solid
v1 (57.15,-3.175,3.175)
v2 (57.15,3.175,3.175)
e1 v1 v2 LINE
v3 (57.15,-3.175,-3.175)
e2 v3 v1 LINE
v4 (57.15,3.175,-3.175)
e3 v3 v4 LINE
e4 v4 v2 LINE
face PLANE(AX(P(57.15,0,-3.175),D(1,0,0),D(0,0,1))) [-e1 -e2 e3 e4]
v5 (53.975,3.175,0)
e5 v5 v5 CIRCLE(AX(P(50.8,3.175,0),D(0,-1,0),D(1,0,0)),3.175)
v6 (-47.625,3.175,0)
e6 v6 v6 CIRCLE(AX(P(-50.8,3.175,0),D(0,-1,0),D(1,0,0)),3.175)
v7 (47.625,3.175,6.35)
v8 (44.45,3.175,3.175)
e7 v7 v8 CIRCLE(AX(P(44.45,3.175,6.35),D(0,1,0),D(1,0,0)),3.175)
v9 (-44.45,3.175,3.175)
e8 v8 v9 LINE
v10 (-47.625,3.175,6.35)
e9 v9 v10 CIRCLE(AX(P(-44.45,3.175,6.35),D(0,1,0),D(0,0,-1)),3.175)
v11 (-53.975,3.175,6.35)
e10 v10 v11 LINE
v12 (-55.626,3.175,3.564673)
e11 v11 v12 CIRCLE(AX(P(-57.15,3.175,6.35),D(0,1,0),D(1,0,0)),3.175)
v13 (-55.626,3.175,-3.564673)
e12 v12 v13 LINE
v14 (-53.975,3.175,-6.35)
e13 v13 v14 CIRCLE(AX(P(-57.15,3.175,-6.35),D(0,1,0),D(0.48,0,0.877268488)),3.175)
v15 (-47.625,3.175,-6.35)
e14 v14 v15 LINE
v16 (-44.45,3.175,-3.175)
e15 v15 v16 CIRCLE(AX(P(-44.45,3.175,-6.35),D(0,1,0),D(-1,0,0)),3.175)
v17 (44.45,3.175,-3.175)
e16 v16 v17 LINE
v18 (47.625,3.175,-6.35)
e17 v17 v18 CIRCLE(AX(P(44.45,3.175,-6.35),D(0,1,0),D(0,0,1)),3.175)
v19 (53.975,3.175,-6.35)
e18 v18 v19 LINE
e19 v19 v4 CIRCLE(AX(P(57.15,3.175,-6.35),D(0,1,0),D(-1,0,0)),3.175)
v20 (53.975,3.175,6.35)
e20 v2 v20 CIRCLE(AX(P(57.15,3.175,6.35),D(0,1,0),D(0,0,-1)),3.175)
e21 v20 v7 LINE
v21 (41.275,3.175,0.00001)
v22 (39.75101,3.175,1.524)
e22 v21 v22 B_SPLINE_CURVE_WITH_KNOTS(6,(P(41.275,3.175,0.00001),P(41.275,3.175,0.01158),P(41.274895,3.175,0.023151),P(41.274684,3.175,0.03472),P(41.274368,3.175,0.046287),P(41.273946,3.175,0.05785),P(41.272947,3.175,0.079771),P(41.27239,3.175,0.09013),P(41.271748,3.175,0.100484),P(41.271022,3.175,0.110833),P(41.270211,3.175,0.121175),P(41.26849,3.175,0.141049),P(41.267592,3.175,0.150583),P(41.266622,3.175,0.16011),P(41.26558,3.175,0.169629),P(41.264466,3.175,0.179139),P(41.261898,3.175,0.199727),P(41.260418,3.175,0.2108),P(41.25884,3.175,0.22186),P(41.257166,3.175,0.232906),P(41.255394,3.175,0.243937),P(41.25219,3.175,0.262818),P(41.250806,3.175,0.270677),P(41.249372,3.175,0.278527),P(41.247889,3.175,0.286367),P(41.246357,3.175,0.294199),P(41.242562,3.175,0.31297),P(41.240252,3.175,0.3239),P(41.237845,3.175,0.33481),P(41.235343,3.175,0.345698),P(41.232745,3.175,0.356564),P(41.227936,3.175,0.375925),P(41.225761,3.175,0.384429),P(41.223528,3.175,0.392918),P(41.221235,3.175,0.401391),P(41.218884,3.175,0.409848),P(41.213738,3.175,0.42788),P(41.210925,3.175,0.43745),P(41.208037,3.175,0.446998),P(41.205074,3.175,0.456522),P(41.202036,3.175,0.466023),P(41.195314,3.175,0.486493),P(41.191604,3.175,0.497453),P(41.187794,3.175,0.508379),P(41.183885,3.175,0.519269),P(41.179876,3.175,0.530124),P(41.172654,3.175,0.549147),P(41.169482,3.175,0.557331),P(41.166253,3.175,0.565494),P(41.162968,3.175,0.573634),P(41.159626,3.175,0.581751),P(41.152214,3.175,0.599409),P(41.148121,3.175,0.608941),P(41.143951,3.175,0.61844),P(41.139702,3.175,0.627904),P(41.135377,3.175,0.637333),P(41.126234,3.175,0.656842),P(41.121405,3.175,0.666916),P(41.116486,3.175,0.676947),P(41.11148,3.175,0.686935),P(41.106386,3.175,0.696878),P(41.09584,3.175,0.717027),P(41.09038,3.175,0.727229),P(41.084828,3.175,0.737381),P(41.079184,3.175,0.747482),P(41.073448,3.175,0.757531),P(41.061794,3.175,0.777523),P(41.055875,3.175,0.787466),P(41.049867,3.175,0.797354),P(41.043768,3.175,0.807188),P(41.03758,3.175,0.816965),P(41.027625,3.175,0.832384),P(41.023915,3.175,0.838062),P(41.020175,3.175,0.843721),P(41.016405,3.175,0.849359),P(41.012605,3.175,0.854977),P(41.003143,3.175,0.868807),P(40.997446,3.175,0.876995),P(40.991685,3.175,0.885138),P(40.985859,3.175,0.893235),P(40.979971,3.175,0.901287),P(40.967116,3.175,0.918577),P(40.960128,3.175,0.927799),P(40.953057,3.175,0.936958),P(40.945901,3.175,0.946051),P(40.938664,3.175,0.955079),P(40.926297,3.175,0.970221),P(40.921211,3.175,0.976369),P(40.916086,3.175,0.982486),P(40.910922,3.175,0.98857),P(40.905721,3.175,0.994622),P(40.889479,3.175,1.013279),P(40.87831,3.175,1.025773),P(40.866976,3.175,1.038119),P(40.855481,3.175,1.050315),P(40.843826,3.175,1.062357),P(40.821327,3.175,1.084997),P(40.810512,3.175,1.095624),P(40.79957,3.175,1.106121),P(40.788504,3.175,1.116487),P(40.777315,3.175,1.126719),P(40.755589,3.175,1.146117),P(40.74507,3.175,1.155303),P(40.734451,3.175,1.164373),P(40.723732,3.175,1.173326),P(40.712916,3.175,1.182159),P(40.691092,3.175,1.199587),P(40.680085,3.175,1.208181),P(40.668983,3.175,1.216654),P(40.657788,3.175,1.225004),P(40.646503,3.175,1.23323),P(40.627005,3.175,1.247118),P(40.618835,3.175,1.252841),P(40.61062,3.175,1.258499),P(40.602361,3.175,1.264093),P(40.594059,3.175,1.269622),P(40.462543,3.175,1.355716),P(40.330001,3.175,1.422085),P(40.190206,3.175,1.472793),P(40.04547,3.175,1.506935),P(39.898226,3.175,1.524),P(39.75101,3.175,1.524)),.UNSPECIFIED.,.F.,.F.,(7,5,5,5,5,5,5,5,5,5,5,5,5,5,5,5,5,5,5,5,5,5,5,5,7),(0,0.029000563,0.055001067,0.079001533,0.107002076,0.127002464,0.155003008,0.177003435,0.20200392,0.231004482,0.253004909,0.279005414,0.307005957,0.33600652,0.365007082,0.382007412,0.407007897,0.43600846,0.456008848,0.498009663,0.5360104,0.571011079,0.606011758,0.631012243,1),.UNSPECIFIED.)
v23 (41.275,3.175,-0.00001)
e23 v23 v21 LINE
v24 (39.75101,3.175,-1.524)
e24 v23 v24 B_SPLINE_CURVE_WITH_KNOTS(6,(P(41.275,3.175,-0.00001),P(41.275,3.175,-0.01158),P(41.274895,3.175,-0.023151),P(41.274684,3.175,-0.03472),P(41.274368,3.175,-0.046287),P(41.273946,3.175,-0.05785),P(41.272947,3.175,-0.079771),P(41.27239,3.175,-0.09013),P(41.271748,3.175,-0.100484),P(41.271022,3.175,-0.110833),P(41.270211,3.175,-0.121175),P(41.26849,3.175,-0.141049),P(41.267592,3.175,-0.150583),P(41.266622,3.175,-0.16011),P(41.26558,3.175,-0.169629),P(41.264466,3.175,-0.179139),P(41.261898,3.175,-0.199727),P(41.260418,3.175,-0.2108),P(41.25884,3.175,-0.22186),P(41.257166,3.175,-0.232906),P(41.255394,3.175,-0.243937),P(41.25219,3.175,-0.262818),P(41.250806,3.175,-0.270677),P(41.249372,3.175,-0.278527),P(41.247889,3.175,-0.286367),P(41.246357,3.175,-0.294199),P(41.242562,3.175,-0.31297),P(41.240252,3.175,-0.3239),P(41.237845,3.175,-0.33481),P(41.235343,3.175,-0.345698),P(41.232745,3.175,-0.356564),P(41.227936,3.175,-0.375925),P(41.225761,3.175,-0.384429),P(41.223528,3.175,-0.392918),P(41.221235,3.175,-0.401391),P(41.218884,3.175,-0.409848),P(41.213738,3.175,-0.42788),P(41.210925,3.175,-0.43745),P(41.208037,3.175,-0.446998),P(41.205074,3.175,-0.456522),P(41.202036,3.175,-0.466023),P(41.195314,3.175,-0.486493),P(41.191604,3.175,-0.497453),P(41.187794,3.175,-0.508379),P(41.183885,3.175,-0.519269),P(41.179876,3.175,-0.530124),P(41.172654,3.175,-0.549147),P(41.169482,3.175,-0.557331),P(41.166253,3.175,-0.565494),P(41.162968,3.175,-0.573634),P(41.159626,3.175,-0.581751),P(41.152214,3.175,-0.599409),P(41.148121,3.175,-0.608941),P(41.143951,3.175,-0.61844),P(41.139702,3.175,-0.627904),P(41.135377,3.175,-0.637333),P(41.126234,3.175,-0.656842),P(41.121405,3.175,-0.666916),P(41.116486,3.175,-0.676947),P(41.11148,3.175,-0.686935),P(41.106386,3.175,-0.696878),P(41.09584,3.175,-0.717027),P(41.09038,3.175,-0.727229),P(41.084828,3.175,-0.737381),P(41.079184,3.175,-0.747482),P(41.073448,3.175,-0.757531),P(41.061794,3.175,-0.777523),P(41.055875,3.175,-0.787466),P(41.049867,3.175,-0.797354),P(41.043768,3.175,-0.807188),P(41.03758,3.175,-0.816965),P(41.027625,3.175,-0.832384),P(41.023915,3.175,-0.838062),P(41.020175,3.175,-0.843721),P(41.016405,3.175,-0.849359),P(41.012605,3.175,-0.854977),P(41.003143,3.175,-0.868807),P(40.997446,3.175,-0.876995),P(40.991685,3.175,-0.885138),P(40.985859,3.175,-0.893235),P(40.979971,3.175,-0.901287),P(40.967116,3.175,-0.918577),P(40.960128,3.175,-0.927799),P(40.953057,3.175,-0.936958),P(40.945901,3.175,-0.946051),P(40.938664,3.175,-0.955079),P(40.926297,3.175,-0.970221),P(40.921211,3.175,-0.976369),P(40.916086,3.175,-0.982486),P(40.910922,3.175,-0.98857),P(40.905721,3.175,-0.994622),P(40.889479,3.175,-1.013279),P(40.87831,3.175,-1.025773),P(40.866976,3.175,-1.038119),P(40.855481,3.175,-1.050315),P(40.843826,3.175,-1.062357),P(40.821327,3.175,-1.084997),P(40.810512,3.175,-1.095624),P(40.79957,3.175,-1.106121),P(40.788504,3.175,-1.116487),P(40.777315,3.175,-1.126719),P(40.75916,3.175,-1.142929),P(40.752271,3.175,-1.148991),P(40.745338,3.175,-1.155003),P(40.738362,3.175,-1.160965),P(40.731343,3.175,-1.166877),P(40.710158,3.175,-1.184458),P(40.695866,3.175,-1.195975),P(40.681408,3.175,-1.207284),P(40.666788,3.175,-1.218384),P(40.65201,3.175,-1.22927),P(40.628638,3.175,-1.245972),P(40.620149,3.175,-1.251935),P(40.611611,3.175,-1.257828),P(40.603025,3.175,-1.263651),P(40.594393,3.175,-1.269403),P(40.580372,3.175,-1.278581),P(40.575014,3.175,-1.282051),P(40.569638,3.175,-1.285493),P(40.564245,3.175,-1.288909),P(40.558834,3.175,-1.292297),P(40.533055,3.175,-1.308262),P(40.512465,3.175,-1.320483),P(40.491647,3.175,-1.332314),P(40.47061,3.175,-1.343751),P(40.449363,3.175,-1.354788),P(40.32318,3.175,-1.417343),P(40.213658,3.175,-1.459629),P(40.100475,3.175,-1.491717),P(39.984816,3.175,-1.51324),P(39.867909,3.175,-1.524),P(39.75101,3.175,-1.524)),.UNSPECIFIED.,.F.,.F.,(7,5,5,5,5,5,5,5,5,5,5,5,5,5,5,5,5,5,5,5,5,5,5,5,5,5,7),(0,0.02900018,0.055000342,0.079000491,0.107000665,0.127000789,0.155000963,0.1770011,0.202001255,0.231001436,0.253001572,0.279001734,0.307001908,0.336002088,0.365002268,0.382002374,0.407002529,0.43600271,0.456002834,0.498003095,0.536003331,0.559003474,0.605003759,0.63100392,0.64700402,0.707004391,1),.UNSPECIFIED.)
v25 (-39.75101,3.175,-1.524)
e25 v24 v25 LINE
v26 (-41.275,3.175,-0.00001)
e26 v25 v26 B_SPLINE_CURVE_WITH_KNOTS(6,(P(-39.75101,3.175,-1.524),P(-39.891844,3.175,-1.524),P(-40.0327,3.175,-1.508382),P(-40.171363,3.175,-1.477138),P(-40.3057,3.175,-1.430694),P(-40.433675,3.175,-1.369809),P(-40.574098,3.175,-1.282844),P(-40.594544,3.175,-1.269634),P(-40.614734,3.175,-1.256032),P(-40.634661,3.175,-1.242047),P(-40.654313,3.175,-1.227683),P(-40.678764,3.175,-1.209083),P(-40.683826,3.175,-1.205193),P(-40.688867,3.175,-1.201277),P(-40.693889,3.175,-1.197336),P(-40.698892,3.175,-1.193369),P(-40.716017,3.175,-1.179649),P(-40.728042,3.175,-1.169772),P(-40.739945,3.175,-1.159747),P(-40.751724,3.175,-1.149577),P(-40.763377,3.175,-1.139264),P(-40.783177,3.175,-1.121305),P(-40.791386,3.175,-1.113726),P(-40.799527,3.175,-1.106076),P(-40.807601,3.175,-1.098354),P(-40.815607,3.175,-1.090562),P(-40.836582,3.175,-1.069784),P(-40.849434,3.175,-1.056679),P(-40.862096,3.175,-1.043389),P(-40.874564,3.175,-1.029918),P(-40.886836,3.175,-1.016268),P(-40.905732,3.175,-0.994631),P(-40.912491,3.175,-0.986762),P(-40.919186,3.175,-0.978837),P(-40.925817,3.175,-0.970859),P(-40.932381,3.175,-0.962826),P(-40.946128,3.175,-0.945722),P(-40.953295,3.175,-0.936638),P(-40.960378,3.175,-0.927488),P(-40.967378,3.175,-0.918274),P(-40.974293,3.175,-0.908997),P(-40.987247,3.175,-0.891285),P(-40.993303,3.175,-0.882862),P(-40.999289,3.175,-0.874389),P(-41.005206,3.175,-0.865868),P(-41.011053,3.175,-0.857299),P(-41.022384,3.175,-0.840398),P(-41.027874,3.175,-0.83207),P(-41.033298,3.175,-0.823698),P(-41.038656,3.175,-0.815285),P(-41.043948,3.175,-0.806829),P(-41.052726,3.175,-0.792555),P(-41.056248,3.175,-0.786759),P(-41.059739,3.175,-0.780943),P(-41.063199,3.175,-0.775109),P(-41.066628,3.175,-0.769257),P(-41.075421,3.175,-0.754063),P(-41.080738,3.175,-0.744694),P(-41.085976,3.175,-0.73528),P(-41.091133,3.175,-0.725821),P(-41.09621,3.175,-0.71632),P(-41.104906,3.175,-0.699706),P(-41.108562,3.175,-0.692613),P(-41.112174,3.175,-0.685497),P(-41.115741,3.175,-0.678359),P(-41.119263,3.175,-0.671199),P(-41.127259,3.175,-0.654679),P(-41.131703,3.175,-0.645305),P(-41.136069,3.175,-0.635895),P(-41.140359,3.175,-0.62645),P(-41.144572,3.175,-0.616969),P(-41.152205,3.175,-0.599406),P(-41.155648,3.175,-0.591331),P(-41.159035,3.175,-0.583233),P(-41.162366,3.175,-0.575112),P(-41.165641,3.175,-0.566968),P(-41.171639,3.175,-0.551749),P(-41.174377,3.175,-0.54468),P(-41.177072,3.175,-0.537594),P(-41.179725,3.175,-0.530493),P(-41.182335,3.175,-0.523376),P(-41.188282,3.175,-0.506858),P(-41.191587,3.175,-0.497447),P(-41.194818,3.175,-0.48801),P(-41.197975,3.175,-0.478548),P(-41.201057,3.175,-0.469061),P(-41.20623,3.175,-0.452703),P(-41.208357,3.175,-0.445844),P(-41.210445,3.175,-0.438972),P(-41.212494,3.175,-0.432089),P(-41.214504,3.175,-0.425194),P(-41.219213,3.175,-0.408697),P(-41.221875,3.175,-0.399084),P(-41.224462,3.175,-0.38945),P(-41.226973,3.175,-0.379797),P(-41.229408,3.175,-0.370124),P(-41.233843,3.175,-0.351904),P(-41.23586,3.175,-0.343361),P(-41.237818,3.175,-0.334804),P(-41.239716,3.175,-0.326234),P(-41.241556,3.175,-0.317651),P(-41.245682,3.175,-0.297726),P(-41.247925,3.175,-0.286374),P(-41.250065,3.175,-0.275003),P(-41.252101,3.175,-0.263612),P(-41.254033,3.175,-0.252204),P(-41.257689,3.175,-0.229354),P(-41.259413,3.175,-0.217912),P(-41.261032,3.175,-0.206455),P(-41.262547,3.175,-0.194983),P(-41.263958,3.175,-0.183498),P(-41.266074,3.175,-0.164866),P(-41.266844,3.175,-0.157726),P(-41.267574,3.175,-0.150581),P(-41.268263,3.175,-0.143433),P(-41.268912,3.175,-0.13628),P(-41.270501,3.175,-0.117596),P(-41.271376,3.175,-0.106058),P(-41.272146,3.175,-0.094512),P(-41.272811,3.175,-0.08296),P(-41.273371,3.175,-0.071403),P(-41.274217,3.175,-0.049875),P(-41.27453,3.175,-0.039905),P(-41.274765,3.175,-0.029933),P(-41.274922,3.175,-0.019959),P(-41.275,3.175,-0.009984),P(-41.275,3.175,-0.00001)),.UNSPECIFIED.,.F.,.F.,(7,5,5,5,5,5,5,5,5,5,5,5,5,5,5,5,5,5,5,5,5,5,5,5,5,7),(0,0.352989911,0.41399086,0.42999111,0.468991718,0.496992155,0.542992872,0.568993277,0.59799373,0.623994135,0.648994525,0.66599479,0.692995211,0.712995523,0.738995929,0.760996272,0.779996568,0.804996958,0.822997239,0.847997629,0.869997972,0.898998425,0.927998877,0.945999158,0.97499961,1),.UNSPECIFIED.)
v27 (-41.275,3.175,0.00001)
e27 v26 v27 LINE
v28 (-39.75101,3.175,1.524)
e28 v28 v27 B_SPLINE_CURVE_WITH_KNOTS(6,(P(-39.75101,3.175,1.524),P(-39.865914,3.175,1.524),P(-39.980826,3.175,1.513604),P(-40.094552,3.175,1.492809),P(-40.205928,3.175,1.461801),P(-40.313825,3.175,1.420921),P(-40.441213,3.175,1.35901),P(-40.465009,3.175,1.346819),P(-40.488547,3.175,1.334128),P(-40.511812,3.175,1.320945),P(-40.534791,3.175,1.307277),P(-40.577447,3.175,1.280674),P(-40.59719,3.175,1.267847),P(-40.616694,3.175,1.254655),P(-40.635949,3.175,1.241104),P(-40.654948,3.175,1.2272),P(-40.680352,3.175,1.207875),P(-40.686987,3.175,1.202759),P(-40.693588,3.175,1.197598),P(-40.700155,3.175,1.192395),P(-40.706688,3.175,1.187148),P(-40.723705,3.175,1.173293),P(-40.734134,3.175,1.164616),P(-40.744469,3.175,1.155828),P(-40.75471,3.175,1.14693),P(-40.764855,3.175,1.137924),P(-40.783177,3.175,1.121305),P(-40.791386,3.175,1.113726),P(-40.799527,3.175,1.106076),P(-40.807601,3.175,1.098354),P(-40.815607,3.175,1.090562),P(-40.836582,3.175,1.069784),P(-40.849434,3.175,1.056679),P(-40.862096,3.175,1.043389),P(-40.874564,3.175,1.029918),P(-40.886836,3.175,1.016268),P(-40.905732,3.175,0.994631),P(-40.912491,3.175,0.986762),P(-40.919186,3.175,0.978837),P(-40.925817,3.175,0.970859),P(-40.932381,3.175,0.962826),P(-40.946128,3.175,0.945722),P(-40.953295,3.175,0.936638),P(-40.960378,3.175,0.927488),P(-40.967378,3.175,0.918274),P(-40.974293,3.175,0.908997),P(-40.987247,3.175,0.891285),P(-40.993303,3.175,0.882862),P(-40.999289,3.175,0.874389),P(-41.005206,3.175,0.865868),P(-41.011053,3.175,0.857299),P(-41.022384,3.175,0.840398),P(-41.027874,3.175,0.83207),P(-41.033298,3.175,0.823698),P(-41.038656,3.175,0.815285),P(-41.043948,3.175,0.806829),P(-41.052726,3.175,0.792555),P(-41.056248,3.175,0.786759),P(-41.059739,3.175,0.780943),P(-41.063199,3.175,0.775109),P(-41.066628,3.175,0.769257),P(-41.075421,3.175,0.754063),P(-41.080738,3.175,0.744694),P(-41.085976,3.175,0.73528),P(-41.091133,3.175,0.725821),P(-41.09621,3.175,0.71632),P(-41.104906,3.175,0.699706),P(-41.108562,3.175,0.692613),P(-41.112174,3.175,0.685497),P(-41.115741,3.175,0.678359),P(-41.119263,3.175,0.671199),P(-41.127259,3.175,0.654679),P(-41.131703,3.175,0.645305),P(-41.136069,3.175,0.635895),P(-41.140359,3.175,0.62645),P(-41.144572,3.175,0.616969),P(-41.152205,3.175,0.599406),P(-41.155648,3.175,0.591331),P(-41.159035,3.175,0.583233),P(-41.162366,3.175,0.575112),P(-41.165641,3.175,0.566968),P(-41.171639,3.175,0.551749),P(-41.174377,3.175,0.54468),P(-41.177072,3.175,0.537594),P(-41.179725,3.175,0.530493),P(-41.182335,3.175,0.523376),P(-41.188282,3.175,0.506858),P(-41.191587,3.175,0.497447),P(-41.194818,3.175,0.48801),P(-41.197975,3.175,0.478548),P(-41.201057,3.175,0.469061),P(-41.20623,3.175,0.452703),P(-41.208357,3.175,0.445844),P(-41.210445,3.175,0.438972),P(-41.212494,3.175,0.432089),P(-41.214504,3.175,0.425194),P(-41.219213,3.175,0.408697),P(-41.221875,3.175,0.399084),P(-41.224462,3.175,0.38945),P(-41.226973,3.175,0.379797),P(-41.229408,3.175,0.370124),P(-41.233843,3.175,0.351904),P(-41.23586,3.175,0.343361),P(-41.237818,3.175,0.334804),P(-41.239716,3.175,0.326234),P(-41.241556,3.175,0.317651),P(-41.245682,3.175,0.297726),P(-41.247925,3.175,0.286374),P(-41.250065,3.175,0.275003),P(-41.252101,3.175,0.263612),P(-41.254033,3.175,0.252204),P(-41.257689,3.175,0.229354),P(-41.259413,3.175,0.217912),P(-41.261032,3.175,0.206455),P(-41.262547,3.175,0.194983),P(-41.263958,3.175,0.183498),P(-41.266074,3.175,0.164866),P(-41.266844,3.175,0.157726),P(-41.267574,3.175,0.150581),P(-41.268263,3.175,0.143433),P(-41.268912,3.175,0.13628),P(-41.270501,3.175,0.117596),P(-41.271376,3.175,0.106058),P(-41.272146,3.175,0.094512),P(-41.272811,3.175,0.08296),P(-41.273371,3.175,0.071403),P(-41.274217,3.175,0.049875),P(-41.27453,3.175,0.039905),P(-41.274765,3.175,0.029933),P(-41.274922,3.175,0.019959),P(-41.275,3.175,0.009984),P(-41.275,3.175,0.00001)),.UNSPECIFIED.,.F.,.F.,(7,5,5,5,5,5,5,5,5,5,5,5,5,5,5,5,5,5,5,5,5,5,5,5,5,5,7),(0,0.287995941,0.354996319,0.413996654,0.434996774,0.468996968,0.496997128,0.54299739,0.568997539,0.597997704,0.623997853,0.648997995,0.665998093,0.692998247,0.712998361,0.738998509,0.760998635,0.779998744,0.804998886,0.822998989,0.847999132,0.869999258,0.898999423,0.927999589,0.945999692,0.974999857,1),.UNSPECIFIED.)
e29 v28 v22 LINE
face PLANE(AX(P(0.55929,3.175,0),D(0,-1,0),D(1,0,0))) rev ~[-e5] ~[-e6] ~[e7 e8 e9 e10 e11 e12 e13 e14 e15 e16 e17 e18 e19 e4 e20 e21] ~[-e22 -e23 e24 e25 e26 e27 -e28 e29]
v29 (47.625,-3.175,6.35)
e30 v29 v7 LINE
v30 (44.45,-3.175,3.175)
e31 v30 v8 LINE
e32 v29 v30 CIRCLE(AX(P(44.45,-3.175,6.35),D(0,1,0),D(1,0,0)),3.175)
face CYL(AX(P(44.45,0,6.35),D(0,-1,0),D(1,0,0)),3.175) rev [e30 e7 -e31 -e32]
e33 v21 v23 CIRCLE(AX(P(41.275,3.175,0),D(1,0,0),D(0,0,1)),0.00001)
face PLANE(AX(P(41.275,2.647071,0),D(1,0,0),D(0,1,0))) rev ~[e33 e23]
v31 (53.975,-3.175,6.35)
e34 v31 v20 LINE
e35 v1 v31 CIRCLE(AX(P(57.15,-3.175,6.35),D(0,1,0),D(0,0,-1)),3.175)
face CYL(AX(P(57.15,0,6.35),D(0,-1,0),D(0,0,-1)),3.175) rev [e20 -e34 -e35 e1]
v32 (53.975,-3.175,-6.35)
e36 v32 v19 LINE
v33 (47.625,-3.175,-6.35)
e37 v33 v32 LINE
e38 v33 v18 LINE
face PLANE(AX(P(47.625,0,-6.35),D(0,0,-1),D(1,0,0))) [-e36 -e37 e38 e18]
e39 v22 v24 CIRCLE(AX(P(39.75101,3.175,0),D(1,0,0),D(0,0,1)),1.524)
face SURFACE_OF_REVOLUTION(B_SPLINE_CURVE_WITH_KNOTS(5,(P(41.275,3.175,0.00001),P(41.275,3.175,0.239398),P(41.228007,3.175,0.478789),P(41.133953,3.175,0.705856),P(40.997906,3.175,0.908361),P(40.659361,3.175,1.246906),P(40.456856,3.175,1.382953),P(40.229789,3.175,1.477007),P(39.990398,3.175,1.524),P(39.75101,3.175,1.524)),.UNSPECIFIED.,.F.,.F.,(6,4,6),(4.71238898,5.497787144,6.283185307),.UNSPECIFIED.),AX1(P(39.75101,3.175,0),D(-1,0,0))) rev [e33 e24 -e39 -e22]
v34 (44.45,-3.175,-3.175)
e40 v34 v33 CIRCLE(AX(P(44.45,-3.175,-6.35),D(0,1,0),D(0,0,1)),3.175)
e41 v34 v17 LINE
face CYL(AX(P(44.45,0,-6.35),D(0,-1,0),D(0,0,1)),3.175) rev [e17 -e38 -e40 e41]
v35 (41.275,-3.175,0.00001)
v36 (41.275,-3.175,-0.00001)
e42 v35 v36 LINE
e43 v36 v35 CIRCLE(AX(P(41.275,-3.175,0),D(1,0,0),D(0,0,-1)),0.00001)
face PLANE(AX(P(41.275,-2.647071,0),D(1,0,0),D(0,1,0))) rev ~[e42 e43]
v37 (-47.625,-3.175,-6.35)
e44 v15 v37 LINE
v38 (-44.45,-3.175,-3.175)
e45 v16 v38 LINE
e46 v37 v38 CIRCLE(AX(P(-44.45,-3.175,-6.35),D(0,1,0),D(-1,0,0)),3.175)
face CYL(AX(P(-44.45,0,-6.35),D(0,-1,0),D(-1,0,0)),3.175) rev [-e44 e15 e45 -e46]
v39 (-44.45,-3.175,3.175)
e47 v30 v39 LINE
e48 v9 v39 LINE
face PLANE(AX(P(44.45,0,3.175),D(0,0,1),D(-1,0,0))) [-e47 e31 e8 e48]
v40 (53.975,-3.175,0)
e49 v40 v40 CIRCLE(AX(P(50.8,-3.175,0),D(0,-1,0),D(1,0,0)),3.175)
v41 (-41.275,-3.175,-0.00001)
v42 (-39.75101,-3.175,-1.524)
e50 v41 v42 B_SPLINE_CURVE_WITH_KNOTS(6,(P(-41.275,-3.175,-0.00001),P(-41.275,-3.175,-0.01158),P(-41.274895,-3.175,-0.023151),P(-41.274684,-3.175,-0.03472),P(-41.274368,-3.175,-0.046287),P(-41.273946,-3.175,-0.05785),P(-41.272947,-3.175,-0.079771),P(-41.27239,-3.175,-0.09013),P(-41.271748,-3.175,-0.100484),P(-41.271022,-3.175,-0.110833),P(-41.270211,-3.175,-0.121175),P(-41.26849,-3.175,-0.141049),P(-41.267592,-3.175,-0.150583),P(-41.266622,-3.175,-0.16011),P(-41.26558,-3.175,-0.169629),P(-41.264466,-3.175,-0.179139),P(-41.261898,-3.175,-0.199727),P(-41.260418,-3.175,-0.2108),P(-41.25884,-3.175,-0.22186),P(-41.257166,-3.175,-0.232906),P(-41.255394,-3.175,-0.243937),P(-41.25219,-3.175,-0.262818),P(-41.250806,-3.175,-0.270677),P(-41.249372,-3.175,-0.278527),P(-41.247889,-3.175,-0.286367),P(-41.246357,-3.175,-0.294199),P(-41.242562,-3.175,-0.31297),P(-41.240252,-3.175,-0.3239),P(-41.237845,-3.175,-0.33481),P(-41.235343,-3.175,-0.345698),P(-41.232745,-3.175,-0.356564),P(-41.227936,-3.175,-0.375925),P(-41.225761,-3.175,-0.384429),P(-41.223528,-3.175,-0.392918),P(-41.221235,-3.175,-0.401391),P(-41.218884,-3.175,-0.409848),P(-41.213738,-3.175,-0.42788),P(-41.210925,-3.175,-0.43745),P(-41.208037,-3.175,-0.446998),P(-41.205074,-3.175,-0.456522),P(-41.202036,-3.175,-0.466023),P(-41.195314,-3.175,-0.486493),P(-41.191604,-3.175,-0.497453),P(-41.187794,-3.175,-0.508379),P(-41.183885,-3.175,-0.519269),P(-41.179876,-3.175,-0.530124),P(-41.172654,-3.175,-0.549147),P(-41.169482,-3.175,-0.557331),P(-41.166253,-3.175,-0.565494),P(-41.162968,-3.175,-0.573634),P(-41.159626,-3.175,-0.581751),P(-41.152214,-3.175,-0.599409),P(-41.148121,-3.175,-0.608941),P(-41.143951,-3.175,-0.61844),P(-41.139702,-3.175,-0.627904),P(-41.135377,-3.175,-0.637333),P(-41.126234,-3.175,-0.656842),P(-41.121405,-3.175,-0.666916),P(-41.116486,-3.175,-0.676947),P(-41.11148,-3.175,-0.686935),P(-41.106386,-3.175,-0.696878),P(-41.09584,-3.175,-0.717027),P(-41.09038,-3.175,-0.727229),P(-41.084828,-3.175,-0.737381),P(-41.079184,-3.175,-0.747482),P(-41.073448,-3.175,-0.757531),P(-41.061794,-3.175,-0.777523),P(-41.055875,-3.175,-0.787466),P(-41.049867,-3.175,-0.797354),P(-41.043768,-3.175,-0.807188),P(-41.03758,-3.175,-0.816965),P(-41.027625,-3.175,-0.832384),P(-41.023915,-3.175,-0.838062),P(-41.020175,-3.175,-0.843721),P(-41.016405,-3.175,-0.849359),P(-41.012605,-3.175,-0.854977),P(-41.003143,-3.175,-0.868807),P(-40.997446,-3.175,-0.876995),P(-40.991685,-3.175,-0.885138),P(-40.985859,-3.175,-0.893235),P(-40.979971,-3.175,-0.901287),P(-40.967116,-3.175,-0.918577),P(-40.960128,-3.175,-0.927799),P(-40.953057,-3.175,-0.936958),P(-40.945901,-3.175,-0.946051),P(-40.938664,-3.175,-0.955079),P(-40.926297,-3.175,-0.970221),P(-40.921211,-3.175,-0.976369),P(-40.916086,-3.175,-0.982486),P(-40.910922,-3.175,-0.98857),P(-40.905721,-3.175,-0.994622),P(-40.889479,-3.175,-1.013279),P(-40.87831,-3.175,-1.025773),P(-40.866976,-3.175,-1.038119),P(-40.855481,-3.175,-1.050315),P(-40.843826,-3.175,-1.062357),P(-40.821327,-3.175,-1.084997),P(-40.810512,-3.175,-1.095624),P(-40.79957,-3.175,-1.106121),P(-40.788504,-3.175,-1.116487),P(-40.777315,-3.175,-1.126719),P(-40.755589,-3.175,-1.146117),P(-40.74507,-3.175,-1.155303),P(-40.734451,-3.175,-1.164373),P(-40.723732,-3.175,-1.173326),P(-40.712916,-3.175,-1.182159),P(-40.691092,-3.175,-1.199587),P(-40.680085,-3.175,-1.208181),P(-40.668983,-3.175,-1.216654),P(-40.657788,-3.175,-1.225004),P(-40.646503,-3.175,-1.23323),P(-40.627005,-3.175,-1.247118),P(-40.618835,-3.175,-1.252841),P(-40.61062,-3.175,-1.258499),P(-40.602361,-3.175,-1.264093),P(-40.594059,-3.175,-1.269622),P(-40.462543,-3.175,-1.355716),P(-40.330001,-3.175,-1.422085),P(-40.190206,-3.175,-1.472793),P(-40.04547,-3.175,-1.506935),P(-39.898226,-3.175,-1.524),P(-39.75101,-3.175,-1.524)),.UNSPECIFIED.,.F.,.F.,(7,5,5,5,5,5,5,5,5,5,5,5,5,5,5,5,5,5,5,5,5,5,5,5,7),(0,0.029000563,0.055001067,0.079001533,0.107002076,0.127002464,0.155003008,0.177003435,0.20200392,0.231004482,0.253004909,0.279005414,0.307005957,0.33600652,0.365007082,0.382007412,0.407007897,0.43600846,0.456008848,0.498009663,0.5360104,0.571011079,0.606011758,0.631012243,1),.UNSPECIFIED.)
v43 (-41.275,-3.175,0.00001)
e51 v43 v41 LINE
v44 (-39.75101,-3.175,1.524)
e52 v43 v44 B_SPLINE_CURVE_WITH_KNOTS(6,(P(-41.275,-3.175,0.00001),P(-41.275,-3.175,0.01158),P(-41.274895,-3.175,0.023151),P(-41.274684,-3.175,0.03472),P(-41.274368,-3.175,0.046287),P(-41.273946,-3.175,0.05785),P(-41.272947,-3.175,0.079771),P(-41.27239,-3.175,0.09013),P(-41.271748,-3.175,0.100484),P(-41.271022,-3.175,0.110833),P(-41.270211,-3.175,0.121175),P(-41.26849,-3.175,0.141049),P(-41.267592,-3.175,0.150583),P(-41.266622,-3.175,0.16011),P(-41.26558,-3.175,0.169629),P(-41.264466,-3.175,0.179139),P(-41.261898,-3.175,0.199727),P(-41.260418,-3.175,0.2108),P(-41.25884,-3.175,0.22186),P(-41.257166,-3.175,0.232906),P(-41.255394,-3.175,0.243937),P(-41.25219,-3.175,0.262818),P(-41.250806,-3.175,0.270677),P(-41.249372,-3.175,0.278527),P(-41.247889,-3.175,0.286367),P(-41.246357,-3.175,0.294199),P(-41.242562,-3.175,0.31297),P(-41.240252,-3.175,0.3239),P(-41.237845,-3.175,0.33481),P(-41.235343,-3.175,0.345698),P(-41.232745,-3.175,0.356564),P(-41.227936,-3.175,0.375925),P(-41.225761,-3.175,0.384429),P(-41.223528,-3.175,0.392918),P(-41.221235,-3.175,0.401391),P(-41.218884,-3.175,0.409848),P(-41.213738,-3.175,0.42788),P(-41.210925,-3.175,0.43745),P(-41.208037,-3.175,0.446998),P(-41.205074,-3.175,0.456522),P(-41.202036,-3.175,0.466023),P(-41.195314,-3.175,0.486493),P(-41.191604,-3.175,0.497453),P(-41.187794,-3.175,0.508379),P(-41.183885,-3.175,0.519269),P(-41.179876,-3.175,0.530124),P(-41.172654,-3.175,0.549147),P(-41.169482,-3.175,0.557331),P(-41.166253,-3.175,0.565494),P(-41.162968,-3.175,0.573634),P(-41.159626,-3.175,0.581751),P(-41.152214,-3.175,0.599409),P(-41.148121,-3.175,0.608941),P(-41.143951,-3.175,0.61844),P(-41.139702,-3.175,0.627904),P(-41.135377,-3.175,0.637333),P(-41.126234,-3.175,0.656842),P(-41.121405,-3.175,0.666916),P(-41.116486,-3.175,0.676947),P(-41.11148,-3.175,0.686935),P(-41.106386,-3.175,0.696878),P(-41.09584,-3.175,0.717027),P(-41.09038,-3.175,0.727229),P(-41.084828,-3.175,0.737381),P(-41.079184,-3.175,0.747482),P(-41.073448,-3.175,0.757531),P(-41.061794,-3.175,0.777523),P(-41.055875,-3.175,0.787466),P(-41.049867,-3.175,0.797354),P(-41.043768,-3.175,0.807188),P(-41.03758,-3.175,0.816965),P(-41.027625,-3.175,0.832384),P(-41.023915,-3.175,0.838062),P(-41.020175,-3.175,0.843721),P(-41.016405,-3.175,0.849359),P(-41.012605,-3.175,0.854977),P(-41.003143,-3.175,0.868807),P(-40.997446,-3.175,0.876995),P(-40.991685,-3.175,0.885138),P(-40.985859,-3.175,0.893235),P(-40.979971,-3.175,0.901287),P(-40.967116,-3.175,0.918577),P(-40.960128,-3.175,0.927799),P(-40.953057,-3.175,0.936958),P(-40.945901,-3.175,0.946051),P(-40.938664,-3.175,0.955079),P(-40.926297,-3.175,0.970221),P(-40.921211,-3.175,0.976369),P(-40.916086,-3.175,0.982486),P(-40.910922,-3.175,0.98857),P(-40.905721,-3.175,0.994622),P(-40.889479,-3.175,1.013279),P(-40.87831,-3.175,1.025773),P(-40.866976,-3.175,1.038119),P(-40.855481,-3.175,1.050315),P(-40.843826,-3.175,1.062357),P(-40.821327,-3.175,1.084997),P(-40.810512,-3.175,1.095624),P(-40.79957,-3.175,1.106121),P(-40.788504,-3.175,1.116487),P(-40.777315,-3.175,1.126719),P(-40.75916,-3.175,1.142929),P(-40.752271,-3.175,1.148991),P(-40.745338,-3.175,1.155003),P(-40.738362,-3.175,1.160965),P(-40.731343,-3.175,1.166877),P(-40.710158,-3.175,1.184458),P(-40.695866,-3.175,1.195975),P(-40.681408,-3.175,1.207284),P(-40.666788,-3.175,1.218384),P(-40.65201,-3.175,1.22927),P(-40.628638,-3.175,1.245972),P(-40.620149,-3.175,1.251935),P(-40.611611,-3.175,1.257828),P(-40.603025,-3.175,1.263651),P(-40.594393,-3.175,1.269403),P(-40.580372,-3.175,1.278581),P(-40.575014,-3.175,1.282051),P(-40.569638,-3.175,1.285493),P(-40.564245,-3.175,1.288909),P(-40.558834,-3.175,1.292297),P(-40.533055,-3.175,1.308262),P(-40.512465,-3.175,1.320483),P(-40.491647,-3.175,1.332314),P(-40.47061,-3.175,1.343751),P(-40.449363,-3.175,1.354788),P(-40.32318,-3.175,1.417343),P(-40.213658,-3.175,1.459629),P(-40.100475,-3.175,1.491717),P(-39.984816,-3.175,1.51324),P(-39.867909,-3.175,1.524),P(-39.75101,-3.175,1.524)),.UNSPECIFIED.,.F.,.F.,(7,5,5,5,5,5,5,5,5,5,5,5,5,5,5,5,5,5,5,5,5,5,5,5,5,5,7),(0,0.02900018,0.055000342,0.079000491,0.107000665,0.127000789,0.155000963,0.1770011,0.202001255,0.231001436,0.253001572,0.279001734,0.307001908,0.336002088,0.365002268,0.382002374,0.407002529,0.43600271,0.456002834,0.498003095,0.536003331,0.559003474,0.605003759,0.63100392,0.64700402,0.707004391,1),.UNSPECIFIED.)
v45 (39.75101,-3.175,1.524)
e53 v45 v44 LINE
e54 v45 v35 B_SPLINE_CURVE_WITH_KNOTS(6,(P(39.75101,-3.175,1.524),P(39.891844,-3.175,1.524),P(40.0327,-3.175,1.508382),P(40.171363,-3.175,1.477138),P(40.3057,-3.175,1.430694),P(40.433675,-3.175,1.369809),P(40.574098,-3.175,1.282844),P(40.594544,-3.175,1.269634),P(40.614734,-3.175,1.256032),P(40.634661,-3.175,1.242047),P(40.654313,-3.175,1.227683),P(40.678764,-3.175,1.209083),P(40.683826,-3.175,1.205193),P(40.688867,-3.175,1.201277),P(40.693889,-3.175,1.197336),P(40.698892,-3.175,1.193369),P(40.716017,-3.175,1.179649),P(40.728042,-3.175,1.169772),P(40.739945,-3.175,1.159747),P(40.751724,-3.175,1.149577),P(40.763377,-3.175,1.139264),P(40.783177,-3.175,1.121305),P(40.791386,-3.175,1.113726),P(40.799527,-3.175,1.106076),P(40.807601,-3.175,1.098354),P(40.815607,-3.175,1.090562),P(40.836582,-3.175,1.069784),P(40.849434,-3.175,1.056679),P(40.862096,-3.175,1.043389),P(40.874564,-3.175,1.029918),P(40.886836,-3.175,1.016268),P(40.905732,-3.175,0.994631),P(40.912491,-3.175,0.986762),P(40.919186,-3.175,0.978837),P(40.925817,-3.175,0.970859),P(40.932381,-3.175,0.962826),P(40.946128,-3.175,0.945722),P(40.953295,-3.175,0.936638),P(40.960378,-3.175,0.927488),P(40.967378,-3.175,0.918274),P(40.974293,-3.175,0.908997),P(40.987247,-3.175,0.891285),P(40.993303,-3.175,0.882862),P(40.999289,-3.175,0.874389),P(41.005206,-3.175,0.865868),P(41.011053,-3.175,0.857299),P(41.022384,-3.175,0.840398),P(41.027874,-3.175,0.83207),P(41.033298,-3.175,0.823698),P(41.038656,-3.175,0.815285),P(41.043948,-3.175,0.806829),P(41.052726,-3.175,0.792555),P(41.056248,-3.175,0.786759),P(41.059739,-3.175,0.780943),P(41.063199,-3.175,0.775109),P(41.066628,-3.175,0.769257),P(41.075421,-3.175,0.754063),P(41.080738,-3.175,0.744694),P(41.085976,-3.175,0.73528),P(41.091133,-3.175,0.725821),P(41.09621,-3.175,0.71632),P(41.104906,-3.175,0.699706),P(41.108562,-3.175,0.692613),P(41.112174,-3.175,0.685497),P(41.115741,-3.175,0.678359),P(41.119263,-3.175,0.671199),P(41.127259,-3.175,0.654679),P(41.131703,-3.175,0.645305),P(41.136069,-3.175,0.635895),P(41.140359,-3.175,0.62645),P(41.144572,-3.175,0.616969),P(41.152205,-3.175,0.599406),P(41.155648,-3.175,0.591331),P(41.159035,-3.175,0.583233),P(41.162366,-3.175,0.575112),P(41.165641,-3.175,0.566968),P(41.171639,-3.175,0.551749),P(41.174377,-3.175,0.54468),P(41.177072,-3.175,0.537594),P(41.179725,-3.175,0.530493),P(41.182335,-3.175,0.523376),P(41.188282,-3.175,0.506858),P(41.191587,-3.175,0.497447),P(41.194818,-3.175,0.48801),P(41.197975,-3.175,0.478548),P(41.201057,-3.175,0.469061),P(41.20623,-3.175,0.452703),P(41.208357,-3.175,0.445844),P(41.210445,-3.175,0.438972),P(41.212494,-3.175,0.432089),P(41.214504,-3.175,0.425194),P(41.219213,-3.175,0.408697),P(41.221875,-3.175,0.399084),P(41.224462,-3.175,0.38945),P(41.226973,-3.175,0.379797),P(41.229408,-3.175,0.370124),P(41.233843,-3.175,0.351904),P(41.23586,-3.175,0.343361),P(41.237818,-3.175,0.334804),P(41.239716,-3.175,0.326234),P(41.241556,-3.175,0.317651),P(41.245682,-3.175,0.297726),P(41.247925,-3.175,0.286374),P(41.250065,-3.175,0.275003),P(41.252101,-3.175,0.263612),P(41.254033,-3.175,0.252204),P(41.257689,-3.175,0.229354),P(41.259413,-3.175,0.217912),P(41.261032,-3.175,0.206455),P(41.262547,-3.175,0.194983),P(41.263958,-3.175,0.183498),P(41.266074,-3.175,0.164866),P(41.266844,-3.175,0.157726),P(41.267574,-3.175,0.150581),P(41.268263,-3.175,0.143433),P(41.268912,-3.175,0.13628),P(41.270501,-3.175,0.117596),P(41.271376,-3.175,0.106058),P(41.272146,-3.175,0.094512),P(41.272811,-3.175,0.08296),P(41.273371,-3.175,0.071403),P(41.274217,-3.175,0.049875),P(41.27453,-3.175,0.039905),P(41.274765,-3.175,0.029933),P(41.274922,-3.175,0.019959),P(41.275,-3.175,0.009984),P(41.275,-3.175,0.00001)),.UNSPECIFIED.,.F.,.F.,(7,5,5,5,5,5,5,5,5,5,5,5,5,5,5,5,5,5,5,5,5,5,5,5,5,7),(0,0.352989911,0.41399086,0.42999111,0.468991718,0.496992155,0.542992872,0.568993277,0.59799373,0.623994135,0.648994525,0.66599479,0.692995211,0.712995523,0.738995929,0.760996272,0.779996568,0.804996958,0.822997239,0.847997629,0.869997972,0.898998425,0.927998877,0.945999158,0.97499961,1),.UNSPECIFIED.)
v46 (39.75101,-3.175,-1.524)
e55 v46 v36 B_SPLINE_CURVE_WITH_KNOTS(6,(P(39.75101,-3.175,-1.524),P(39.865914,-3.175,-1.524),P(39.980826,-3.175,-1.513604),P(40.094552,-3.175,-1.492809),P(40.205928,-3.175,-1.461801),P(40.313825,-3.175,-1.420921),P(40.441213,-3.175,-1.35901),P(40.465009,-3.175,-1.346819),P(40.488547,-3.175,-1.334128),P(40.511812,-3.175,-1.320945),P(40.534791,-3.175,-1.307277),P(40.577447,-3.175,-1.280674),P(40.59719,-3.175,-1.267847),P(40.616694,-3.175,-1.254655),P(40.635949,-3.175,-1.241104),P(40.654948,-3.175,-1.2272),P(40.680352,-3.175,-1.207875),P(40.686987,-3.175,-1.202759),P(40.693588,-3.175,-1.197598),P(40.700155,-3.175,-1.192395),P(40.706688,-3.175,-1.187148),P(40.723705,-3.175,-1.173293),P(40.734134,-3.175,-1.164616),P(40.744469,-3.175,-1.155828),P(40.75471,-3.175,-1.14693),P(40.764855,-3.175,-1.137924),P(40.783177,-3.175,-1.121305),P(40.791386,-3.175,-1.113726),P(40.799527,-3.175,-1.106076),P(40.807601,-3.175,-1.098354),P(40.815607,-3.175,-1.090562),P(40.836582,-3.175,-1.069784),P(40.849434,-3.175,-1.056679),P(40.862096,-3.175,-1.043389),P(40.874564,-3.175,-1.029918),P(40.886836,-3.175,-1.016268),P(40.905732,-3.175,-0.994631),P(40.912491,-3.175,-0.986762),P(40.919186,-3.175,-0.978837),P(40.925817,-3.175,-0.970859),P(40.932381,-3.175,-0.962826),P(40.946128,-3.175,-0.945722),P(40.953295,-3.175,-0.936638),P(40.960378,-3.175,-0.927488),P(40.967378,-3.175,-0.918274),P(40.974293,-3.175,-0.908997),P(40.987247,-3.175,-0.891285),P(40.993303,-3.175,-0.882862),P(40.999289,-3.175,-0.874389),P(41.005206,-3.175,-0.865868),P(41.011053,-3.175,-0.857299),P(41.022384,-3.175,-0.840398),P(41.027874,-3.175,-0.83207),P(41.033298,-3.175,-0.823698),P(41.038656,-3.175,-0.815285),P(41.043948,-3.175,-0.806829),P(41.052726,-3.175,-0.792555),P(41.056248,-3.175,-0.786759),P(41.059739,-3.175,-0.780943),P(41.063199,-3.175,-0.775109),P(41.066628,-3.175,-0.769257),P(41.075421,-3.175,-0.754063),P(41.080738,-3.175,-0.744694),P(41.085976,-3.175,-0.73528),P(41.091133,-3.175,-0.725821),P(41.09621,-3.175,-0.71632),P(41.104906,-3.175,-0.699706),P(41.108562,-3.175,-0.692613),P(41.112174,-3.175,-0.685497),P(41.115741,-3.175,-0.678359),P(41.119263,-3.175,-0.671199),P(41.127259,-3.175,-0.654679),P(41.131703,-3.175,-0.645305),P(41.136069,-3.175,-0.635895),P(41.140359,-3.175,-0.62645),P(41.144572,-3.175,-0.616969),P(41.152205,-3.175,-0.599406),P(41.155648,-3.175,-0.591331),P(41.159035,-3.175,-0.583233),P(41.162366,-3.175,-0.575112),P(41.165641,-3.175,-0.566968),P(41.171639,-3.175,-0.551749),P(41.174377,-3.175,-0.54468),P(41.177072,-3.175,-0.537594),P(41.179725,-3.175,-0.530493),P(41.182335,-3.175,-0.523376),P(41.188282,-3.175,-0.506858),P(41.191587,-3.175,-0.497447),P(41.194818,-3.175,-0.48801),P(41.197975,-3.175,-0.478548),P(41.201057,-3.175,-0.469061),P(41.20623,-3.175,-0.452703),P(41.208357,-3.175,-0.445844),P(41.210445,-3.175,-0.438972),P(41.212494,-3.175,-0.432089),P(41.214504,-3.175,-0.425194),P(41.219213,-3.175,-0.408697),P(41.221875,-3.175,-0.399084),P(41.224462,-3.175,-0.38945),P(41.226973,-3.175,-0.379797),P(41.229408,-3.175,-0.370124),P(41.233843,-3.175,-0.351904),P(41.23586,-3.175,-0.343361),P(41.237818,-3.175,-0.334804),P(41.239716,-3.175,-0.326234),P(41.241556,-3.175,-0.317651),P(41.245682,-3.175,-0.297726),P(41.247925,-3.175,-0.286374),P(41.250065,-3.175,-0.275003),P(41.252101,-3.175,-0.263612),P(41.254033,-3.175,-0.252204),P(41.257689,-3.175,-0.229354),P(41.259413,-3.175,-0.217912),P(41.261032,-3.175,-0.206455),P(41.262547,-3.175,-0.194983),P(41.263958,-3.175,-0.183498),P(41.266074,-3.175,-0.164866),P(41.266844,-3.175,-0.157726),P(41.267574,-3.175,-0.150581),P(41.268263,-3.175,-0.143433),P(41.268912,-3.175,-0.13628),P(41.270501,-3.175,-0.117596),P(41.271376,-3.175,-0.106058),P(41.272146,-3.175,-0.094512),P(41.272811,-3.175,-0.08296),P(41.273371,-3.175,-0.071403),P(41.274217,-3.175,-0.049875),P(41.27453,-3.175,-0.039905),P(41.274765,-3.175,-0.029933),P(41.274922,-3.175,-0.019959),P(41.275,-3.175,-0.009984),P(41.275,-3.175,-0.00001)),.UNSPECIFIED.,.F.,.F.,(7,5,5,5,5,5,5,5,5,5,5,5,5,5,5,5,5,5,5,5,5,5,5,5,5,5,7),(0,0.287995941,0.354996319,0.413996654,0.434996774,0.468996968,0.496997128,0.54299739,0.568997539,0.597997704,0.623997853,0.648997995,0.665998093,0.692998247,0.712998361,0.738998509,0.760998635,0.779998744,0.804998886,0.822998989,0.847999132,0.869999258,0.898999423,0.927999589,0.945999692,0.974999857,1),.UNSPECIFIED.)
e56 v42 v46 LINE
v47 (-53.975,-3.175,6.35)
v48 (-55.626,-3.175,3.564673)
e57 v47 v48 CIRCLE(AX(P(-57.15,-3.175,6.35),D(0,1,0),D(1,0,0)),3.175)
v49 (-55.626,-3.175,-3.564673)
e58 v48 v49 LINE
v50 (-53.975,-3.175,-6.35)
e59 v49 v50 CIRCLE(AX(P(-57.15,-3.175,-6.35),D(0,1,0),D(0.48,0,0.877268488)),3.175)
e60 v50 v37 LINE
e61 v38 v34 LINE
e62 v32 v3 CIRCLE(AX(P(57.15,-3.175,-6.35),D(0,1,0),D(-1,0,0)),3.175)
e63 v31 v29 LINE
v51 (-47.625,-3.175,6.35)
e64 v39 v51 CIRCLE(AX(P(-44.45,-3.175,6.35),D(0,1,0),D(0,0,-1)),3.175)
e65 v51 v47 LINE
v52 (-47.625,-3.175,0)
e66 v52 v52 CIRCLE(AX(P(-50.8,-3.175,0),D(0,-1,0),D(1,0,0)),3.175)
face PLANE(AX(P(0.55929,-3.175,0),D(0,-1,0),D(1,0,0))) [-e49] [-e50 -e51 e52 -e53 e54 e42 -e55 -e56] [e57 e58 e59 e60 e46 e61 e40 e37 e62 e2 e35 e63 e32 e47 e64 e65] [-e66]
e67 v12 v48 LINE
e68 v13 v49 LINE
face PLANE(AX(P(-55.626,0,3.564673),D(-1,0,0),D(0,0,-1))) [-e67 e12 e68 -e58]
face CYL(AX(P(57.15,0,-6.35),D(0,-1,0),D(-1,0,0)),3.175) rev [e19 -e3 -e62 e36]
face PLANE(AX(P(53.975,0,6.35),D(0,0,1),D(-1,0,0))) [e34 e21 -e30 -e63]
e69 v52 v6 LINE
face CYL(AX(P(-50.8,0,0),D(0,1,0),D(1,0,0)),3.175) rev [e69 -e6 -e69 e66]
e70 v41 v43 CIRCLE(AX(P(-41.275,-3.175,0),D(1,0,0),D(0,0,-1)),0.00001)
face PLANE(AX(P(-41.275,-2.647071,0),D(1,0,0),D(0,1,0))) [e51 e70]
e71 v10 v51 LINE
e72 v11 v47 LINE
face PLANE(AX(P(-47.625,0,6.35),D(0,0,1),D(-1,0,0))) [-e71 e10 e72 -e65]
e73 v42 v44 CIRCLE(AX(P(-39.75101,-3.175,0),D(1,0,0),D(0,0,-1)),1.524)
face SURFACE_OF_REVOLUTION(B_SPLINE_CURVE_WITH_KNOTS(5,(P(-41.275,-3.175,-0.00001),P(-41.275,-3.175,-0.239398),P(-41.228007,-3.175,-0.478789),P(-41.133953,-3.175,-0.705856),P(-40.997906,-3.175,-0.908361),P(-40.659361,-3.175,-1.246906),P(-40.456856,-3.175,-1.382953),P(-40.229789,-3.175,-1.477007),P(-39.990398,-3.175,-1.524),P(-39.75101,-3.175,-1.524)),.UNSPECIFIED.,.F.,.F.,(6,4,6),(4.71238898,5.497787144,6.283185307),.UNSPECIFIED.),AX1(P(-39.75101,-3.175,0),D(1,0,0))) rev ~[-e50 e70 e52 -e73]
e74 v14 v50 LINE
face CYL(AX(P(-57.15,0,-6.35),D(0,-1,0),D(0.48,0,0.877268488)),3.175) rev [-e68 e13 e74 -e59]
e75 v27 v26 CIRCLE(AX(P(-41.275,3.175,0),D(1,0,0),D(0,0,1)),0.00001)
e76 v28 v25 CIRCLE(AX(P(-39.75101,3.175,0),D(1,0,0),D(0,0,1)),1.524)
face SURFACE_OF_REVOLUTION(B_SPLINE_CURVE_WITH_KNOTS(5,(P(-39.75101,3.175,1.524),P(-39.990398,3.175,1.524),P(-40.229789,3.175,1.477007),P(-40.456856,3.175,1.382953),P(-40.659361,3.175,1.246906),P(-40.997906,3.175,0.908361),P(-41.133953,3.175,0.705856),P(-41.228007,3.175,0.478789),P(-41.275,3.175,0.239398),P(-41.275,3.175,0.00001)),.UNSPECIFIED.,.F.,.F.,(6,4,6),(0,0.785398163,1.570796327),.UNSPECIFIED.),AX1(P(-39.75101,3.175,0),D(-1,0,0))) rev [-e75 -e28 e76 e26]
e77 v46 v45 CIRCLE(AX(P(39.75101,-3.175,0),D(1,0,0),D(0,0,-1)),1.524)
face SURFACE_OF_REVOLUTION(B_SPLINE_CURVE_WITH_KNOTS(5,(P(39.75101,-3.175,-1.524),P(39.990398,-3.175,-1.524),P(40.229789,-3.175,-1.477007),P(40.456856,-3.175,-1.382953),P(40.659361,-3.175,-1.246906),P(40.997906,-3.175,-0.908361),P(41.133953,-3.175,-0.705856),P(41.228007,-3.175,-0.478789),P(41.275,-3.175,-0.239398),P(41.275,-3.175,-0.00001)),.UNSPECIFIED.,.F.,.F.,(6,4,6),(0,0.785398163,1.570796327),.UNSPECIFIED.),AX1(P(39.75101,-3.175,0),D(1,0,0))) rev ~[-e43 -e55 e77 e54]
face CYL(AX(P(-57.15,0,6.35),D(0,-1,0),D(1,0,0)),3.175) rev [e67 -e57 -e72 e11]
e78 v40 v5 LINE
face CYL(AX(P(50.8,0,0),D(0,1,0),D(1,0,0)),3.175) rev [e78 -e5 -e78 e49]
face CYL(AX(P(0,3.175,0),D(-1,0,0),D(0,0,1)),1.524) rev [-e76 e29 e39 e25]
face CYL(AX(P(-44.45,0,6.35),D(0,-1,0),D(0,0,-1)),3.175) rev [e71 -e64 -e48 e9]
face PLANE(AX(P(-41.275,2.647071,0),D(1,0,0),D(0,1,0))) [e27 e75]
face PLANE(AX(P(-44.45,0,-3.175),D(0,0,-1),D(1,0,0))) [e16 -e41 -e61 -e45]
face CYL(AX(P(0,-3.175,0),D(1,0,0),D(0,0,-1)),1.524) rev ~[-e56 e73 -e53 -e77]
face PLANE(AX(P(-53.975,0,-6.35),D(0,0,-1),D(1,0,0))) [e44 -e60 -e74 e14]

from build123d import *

# Parameters (mm, degrees)
F0_R     = 3.175
F1_DEPTH = 3.175
F3_DEPTH = 41.275
F4_R     = 1.52399


# Not quite as in the source:
# - a fillet or chamfer is up to 0.001 mm smaller than in the source, because OpenCascade refuses the exact size


with BuildPart() as f1:
    # F0 (on Front) → F1 (new body, symmetric)
    with BuildSketch(Plane.XZ):
        with BuildLine():
            Line((44.45, 3.175), (-44.45, 3.175))
            ThreePointArc((-44.45, 3.175), (-46.6950640303, 4.1049359697), (-47.625, 6.35))
            Line((-47.625, 6.35), (-53.975, 6.35))
            ThreePointArc((-53.975, 6.35), (-54.4187617277, 4.7310613044), (-55.626, 3.5646725507))
            Line((-55.626, 3.5646725507), (-55.626, -3.5646725507))
            ThreePointArc((-55.626, -3.5646725507), (-54.4187617277, -4.7310613044), (-53.975, -6.35))
            Line((-53.975, -6.35), (-47.625, -6.35))
            ThreePointArc((-47.625, -6.35), (-46.6950640303, -4.1049359697), (-44.45, -3.175))
            Line((-44.45, -3.175), (44.45, -3.175))
            ThreePointArc((44.45, -3.175), (46.6950640303, -4.1049359697), (47.625, -6.35))
            Line((47.625, -6.35), (53.975, -6.35))
            ThreePointArc((53.975, -6.35), (54.9049359697, -4.1049359697), (57.15, -3.175))
            Line((57.15, -3.175), (57.15, 3.175))
            ThreePointArc((57.15, 3.175), (54.9049359697, 4.1049359697), (53.975, 6.35))
            Line((53.975, 6.35), (47.625, 6.35))
            ThreePointArc((47.625, 6.35), (46.6950640303, 4.1049359697), (44.45, 3.175))
        make_face()
        with Locations((-50.8, 0)):
            Circle(F0_R, mode=Mode.SUBTRACT)
        with Locations((50.8, 0)):
            Circle(F0_R, mode=Mode.SUBTRACT)
    extrude(amount=F1_DEPTH, both=True)

    # F2 (on Right) → F3 (cut, symmetric)
    with BuildSketch(Plane.YZ):
        with BuildLine():
            Line((3.175, -1.524), (3.175, 1.524))
            ThreePointArc((3.175, 1.524), (1.651, 0), (3.175, -1.524))
        make_face()
        with BuildLine():
            Line((-3.175, 1.524), (-3.175, -1.524))
            ThreePointArc((-3.175, -1.524), (-1.651, 0), (-3.175, 1.524))
        make_face()
    extrude(amount=F3_DEPTH, both=True, mode=Mode.SUBTRACT)

    # F4 (radius 1.524 in the source; OpenCascade refuses exactly that, so slightly less here)
    f4_edges = [f1.edges().sort_by_distance(p)[0] for p in [
        (41.275, 1.651, 0),
        (-41.275, 1.651, 0),
        (-41.275, -1.651, 0),
        (41.275, -1.651, 0),
    ]]
    fillet(f4_edges, radius=F4_R)


solid = f1.part
